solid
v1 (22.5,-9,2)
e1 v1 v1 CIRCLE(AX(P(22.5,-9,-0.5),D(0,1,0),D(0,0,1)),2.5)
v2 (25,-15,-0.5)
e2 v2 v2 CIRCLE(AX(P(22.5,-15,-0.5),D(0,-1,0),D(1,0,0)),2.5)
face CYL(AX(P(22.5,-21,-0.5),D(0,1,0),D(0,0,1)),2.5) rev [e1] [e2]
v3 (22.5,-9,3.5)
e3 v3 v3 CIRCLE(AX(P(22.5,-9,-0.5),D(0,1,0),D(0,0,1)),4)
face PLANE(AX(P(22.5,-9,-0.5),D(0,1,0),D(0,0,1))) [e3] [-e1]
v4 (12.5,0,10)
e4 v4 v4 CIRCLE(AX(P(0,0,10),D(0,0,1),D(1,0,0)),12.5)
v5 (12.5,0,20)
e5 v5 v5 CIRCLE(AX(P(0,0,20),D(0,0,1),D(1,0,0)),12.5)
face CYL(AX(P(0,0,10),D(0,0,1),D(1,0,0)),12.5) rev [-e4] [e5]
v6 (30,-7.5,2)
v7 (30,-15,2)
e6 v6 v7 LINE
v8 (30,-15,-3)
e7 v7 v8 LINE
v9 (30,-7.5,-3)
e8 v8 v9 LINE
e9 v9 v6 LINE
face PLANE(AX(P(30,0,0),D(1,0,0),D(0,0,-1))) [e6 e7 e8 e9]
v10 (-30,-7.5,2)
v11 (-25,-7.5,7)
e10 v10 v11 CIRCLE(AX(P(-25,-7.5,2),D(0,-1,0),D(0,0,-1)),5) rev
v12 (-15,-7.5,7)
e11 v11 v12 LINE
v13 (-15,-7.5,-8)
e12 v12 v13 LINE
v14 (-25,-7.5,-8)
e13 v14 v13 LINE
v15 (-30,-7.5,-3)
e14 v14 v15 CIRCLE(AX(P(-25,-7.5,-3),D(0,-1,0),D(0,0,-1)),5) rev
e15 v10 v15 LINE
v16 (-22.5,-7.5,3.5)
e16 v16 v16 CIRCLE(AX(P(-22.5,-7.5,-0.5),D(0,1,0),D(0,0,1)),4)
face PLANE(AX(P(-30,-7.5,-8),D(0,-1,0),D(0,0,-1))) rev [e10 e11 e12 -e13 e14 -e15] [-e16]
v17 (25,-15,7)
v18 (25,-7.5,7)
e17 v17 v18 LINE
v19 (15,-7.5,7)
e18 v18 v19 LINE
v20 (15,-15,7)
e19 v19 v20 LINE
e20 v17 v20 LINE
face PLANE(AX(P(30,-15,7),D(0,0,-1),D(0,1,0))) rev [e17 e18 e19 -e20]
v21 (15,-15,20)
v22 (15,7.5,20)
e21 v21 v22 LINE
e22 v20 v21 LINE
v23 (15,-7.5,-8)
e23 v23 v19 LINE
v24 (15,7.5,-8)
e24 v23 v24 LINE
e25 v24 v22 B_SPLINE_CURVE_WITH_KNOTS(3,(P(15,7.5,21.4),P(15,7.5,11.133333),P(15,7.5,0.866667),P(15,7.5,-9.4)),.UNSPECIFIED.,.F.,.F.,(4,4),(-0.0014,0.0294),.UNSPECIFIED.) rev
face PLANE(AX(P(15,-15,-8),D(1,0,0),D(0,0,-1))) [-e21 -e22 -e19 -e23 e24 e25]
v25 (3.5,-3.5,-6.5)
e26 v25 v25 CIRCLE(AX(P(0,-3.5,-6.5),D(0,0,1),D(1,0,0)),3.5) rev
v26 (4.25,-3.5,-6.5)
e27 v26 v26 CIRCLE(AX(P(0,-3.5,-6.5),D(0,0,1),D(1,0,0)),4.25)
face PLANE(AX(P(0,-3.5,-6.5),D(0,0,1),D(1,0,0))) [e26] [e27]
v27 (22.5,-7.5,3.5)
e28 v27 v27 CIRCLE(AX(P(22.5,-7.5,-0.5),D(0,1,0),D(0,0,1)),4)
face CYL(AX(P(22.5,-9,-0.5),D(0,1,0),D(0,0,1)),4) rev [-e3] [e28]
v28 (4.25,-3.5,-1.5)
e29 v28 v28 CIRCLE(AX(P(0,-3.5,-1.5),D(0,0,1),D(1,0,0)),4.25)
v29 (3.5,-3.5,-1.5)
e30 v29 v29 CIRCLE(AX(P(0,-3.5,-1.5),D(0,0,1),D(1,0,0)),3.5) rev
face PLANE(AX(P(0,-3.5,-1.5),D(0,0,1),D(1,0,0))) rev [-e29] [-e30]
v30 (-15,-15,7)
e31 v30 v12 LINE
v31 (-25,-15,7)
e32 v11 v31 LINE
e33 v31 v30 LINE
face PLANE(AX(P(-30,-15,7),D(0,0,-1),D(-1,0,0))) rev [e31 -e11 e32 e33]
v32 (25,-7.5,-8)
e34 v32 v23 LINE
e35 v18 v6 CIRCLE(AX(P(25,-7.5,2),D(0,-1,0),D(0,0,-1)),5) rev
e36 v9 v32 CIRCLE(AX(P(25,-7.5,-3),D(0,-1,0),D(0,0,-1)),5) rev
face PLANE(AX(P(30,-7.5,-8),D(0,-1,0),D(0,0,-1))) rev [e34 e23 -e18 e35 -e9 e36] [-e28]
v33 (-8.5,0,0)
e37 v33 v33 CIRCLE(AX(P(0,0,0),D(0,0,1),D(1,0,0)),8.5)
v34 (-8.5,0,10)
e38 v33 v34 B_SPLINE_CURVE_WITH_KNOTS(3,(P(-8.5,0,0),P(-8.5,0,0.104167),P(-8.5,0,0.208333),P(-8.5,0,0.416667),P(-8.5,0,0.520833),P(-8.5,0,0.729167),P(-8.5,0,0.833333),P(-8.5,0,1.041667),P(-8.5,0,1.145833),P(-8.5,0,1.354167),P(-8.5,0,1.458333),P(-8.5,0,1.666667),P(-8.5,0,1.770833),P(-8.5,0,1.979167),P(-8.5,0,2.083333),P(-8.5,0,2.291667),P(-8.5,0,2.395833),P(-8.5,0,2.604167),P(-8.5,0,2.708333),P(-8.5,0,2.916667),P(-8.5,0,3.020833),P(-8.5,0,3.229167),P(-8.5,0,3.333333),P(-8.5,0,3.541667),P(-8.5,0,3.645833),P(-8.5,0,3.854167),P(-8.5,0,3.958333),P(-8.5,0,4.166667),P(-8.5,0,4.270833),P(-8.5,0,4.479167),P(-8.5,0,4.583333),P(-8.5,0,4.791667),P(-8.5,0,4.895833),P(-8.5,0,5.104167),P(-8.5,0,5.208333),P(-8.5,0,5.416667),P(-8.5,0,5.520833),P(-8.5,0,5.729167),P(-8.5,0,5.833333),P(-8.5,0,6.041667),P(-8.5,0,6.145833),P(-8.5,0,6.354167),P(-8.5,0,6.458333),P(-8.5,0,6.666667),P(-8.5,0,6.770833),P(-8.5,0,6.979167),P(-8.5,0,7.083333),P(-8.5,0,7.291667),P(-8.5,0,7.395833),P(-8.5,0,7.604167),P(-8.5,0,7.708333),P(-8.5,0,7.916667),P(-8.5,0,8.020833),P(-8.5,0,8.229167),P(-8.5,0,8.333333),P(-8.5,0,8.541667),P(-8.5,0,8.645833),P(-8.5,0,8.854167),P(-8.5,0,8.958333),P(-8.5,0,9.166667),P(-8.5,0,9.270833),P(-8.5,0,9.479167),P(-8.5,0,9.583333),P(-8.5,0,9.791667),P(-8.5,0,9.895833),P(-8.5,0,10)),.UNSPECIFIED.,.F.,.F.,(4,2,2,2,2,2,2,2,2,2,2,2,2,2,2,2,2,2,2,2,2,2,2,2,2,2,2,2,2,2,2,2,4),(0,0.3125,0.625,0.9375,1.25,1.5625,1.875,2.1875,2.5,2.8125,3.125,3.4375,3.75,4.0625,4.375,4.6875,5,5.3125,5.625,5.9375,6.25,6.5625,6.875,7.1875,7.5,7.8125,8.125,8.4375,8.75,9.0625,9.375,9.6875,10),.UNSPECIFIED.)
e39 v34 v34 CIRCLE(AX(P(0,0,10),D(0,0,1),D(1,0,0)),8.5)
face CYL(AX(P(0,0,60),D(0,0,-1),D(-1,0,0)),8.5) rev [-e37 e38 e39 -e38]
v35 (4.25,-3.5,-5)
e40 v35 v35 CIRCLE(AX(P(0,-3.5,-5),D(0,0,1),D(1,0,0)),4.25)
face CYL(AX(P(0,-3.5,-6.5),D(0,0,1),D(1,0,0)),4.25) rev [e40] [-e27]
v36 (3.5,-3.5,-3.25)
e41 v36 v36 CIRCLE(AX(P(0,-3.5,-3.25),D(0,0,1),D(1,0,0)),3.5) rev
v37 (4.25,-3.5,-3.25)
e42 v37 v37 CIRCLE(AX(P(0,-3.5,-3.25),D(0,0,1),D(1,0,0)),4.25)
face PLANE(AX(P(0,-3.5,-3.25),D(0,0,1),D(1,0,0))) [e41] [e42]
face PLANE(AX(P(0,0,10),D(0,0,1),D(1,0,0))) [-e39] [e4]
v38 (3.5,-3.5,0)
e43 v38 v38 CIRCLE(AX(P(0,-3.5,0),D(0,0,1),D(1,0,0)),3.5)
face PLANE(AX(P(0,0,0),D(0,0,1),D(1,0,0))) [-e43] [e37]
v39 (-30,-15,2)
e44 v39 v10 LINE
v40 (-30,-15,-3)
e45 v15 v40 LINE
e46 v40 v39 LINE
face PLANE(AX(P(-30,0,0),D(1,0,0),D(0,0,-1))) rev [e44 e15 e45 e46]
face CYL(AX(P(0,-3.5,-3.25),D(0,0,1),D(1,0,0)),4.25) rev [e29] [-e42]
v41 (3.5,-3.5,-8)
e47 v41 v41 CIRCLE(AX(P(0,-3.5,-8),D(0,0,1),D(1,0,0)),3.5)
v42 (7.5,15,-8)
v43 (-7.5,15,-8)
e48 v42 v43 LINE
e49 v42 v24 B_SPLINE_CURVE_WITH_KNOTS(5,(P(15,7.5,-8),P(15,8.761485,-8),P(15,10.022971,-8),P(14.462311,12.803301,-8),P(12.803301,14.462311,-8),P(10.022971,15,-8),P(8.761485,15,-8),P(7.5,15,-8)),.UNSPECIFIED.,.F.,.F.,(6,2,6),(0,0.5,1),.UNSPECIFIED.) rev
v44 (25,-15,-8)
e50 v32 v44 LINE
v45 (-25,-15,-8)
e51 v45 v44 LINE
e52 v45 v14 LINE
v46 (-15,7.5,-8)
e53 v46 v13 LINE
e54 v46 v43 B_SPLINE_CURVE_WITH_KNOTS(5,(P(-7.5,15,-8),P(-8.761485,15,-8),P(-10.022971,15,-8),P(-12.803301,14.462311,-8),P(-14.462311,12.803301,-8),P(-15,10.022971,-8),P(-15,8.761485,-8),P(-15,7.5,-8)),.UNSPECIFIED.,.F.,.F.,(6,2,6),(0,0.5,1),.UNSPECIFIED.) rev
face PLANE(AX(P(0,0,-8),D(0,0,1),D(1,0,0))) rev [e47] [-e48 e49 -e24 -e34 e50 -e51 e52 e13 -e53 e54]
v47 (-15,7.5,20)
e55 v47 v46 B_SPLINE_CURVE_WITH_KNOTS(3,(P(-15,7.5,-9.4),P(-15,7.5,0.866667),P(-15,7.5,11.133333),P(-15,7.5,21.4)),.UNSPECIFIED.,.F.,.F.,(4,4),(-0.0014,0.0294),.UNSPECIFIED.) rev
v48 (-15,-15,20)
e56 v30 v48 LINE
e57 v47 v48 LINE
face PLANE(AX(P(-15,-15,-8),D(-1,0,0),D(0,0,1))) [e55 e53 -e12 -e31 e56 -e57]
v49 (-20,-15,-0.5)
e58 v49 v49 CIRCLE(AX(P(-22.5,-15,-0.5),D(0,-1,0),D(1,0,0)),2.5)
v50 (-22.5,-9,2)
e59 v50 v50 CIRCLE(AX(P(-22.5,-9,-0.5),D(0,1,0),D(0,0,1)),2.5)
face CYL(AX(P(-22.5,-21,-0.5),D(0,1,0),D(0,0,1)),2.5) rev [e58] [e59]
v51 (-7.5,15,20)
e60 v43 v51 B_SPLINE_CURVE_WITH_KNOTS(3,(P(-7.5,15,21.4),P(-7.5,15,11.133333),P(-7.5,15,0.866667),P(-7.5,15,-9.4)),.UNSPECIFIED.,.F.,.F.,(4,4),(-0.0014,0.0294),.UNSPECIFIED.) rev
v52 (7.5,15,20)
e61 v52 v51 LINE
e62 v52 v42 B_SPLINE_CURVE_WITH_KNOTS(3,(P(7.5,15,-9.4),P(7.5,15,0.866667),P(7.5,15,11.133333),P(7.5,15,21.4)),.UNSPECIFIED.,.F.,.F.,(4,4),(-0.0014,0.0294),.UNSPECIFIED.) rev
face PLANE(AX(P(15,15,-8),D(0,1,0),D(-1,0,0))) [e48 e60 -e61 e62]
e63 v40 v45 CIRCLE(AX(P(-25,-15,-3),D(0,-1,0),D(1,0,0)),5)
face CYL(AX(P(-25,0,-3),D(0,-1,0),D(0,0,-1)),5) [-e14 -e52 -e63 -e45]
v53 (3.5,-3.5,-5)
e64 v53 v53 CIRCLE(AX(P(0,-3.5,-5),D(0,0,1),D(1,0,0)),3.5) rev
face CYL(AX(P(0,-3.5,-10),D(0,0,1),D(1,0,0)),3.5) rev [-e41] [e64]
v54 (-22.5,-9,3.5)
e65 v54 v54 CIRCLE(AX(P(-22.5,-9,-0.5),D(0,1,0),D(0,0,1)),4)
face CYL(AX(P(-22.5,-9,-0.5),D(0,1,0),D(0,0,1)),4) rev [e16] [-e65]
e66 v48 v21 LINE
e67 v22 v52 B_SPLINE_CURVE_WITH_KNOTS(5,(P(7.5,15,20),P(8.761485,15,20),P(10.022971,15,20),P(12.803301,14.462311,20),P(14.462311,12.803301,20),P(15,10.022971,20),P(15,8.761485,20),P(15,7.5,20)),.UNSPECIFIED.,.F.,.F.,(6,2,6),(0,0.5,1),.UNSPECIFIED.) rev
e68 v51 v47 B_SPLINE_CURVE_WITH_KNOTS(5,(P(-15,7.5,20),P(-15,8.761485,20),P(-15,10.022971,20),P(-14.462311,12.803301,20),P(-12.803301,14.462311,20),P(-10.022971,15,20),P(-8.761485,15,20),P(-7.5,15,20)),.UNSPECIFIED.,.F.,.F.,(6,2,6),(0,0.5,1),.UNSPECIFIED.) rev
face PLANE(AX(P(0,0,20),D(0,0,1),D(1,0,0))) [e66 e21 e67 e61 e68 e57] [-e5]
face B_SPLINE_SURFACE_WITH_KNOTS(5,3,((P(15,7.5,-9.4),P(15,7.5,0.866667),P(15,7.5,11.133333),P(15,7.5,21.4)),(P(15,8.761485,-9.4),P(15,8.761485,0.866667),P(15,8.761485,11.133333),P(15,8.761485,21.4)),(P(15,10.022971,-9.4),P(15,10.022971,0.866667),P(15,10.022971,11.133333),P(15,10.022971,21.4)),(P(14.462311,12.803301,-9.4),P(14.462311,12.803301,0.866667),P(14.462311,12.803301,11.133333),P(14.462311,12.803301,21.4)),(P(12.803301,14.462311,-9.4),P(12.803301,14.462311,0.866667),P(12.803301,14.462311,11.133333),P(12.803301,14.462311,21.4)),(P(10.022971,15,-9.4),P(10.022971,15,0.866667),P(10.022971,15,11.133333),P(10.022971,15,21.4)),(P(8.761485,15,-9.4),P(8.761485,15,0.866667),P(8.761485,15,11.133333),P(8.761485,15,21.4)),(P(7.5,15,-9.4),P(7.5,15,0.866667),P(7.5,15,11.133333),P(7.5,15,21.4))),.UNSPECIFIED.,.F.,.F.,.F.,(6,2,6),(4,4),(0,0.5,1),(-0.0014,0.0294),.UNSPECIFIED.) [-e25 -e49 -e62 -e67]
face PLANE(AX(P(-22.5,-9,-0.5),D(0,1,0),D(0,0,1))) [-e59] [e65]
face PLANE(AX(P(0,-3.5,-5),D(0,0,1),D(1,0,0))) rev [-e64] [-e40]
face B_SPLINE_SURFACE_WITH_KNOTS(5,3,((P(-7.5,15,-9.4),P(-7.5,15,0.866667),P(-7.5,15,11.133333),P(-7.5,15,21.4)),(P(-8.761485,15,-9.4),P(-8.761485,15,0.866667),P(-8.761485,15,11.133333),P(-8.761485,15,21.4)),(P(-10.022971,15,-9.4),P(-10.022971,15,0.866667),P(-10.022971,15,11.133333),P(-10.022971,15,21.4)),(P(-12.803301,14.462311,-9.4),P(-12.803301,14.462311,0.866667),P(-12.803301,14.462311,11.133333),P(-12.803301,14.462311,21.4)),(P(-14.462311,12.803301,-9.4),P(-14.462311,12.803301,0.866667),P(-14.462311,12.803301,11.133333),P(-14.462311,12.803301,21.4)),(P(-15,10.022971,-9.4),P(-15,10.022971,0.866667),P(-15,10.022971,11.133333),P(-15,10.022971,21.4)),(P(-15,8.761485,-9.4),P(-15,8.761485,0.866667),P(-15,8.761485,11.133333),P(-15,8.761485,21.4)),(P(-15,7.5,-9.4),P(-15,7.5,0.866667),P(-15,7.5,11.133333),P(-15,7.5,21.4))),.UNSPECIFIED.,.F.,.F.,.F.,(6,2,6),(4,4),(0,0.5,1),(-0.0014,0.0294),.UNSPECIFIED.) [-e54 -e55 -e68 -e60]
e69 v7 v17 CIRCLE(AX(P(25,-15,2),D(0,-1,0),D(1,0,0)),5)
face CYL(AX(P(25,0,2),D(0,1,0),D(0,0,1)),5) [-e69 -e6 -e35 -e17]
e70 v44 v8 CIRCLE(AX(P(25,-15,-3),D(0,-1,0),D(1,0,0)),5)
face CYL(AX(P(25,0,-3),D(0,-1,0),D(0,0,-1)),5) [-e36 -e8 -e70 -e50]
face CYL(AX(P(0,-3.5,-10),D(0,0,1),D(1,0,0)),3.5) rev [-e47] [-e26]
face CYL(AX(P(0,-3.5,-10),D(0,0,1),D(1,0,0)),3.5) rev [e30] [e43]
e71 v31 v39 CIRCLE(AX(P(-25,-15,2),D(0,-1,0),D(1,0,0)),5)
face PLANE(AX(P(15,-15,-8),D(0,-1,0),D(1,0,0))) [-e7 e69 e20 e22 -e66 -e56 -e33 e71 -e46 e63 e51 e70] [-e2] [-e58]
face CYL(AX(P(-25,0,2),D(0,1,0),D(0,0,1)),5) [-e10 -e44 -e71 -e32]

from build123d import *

# Parameters (mm, degrees)
BOSS_EXTRUDE1_DEPTH      = 20
BOSS_EXTRUDE1_DEPTH_BACK = 8
SKETCH1_W                = 30
SKETCH1_H                = 30
FILLET1_SIZE             = 7.5
SKETCH2_R                = 8.5
CUT_EXTRUDE1_DEPTH       = 60
SKETCH3_W                = 15
SKETCH3_H                = 7.5
BOSS_EXTRUDE2_DEPTH      = 15
SKETCH5_W                = 15
SKETCH5_H                = 7.5
BOSS_EXTRUDE4_DEPTH      = 15
SKETCH11_R               = 12.5
CUT_EXTRUDE3_DEPTH       = 10
SKETCH12_R               = 3.5
CUT_EXTRUDE4_DEPTH       = 10
FILLET8_R                = 5
SKETCH15_R               = 4
CUT_EXTRUDE5_DEPTH       = 1.5
SKETCH16_R               = 2.5
CUT_EXTRUDE6_DEPTH       = 12
CUT_EXTRUDE8_START       = -1.5
SKETCH18_R               = 4.25
CUT_EXTRUDE8_DEPTH       = 1.75
CUT_EXTRUDE9_START       = -5
SKETCH18_2_R             = 4.25
CUT_EXTRUDE9_DEPTH       = 1.5


with BuildPart() as part:
    # Sketch1 → Boss-Extrude1 (new, two sides: drawn at the far end of the back side and taken through both)
    with BuildSketch(Plane.XY.offset(-BOSS_EXTRUDE1_DEPTH_BACK)):
        Rectangle(SKETCH1_W, SKETCH1_H)
    extrude(amount=BOSS_EXTRUDE1_DEPTH + BOSS_EXTRUDE1_DEPTH_BACK)

    # Fillet1
    # a fillet whose section is not a circle: 7.5 mm, written as the material it takes off along each edge
    with BuildSketch(Plane(origin=(-15, 15, 38.75), x_dir=(1, 0, 0), z_dir=(0, 0, -1))) as fillet1_piece_1:
        with BuildLine():
            add(Edge.make_bspline([(FILLET1_SIZE, 0), (FILLET1_SIZE * 0.831801948466, 0), (FILLET1_SIZE * 0.663603896932, 0), (FILLET1_SIZE * 0.292893218813, FILLET1_SIZE * 0.0716919198361), (FILLET1_SIZE * 0.0716919198361, FILLET1_SIZE * 0.292893218813), (0, FILLET1_SIZE * 0.663603896932), (0, FILLET1_SIZE * 0.831801948466), (0, FILLET1_SIZE)], knots=[0, 0, 0, 0, 0, 0, 0.5, 0.5, 1, 1, 1, 1, 1, 1], degree=5))
            Line((0, FILLET1_SIZE), (0, 0))
            Line((0, 0), (FILLET1_SIZE, 0))
        make_face()
    extrude(amount=65.5, mode=Mode.SUBTRACT)
    with BuildSketch(Plane(origin=(15, 15, -26.75), x_dir=(0, -1, 0), z_dir=(0, 0, 1))) as fillet1_piece_2:
        with BuildLine():
            add(Edge.make_bspline([(FILLET1_SIZE, 0), (FILLET1_SIZE * 0.831801948466, 0), (FILLET1_SIZE * 0.663603896932, 0), (FILLET1_SIZE * 0.292893218813, -FILLET1_SIZE * 0.0716919198361), (FILLET1_SIZE * 0.0716919198361, -FILLET1_SIZE * 0.292893218813), (0, -FILLET1_SIZE * 0.663603896932), (0, -FILLET1_SIZE * 0.831801948466), (0, -FILLET1_SIZE)], knots=[0, 0, 0, 0, 0, 0, 0.5, 0.5, 1, 1, 1, 1, 1, 1], degree=5))
            Line((0, -FILLET1_SIZE), (0, 0))
            Line((0, 0), (FILLET1_SIZE, 0))
        make_face()
    extrude(amount=65.5, mode=Mode.SUBTRACT)

    # Sketch2 → Cut-Extrude1 (cut)
    with BuildSketch(Plane.XY):
        with Locations(Location((0, 0, 0), (0, 0, 180))):
            Circle(SKETCH2_R)
    extrude(amount=CUT_EXTRUDE1_DEPTH, mode=Mode.SUBTRACT)

    # Sketch3 → Boss-Extrude2 (add)
    with BuildSketch(Plane(origin=(15, 0, 0), x_dir=(0, 0, -1), z_dir=(1, 0, 0))):
        with Locations((0.5, -11.25)):
            Rectangle(SKETCH3_W, SKETCH3_H)
    extrude(amount=BOSS_EXTRUDE2_DEPTH)

    # Sketch5 → Boss-Extrude4 (add)
    with BuildSketch(Plane.ZY.offset(15)):
        with Locations((-0.5, -11.25)):
            Rectangle(SKETCH5_W, SKETCH5_H)
    extrude(amount=BOSS_EXTRUDE4_DEPTH)

    # Sketch11 → Cut-Extrude3 (cut)
    with BuildSketch(Plane.XY.offset(20)):
        Circle(SKETCH11_R)
    extrude(amount=-CUT_EXTRUDE3_DEPTH, mode=Mode.SUBTRACT)

    # Sketch12 → Cut-Extrude4 (cut)
    with BuildSketch(Plane.XY):
        with Locations((0, -3.5)):
            Circle(SKETCH12_R)
    extrude(amount=-CUT_EXTRUDE4_DEPTH, mode=Mode.SUBTRACT)

    # Fillet8
    fillet8_edges = [part.edges().sort_by_distance(p)[0] for p in [
        (30, -11.25, -8),
        (30, -11.25, 7),
        (-30, -11.25, -8),
        (-30, -11.25, 7),
    ]]
    fillet(fillet8_edges, radius=FILLET8_R)

    # Sketch15 → Cut-Extrude5 (cut)
    with BuildSketch(Plane(origin=(0, -7.5, 0), x_dir=(1, 0, 0), z_dir=(0, 1, 0))):
        with Locations(Location((22.5, 0.5, 0), (0, 0, 270))):
            Circle(SKETCH15_R)
        with Locations(Location((-22.5, 0.5, 0), (0, 0, 270))):
            Circle(SKETCH15_R)
    extrude(amount=-CUT_EXTRUDE5_DEPTH, mode=Mode.SUBTRACT)

    # Sketch16 → Cut-Extrude6 (cut)
    with BuildSketch(Plane(origin=(0, -9, 0), x_dir=(1, 0, 0), z_dir=(0, 1, 0))):
        with Locations(Location((-22.5, 0.5, 0), (0, 0, 270))):
            Circle(SKETCH16_R)
        with Locations(Location((22.5, 0.5, 0), (0, 0, 270))):
            Circle(SKETCH16_R)
    extrude(amount=-CUT_EXTRUDE6_DEPTH, mode=Mode.SUBTRACT)

    # Sketch18 → Cut-Extrude8 (cut)
    with BuildSketch(Plane.XY.offset(CUT_EXTRUDE8_START)):
        with Locations((0, -3.5)):
            Circle(SKETCH18_R)
    extrude(amount=-CUT_EXTRUDE8_DEPTH, mode=Mode.SUBTRACT)

    # Sketch18<2> → Cut-Extrude9 (cut)
    with BuildSketch(Plane.XY.offset(CUT_EXTRUDE9_START)):
        with Locations((0, -3.5)):
            Circle(SKETCH18_2_R)
    extrude(amount=-CUT_EXTRUDE9_DEPTH, mode=Mode.SUBTRACT)


solid = part.part
